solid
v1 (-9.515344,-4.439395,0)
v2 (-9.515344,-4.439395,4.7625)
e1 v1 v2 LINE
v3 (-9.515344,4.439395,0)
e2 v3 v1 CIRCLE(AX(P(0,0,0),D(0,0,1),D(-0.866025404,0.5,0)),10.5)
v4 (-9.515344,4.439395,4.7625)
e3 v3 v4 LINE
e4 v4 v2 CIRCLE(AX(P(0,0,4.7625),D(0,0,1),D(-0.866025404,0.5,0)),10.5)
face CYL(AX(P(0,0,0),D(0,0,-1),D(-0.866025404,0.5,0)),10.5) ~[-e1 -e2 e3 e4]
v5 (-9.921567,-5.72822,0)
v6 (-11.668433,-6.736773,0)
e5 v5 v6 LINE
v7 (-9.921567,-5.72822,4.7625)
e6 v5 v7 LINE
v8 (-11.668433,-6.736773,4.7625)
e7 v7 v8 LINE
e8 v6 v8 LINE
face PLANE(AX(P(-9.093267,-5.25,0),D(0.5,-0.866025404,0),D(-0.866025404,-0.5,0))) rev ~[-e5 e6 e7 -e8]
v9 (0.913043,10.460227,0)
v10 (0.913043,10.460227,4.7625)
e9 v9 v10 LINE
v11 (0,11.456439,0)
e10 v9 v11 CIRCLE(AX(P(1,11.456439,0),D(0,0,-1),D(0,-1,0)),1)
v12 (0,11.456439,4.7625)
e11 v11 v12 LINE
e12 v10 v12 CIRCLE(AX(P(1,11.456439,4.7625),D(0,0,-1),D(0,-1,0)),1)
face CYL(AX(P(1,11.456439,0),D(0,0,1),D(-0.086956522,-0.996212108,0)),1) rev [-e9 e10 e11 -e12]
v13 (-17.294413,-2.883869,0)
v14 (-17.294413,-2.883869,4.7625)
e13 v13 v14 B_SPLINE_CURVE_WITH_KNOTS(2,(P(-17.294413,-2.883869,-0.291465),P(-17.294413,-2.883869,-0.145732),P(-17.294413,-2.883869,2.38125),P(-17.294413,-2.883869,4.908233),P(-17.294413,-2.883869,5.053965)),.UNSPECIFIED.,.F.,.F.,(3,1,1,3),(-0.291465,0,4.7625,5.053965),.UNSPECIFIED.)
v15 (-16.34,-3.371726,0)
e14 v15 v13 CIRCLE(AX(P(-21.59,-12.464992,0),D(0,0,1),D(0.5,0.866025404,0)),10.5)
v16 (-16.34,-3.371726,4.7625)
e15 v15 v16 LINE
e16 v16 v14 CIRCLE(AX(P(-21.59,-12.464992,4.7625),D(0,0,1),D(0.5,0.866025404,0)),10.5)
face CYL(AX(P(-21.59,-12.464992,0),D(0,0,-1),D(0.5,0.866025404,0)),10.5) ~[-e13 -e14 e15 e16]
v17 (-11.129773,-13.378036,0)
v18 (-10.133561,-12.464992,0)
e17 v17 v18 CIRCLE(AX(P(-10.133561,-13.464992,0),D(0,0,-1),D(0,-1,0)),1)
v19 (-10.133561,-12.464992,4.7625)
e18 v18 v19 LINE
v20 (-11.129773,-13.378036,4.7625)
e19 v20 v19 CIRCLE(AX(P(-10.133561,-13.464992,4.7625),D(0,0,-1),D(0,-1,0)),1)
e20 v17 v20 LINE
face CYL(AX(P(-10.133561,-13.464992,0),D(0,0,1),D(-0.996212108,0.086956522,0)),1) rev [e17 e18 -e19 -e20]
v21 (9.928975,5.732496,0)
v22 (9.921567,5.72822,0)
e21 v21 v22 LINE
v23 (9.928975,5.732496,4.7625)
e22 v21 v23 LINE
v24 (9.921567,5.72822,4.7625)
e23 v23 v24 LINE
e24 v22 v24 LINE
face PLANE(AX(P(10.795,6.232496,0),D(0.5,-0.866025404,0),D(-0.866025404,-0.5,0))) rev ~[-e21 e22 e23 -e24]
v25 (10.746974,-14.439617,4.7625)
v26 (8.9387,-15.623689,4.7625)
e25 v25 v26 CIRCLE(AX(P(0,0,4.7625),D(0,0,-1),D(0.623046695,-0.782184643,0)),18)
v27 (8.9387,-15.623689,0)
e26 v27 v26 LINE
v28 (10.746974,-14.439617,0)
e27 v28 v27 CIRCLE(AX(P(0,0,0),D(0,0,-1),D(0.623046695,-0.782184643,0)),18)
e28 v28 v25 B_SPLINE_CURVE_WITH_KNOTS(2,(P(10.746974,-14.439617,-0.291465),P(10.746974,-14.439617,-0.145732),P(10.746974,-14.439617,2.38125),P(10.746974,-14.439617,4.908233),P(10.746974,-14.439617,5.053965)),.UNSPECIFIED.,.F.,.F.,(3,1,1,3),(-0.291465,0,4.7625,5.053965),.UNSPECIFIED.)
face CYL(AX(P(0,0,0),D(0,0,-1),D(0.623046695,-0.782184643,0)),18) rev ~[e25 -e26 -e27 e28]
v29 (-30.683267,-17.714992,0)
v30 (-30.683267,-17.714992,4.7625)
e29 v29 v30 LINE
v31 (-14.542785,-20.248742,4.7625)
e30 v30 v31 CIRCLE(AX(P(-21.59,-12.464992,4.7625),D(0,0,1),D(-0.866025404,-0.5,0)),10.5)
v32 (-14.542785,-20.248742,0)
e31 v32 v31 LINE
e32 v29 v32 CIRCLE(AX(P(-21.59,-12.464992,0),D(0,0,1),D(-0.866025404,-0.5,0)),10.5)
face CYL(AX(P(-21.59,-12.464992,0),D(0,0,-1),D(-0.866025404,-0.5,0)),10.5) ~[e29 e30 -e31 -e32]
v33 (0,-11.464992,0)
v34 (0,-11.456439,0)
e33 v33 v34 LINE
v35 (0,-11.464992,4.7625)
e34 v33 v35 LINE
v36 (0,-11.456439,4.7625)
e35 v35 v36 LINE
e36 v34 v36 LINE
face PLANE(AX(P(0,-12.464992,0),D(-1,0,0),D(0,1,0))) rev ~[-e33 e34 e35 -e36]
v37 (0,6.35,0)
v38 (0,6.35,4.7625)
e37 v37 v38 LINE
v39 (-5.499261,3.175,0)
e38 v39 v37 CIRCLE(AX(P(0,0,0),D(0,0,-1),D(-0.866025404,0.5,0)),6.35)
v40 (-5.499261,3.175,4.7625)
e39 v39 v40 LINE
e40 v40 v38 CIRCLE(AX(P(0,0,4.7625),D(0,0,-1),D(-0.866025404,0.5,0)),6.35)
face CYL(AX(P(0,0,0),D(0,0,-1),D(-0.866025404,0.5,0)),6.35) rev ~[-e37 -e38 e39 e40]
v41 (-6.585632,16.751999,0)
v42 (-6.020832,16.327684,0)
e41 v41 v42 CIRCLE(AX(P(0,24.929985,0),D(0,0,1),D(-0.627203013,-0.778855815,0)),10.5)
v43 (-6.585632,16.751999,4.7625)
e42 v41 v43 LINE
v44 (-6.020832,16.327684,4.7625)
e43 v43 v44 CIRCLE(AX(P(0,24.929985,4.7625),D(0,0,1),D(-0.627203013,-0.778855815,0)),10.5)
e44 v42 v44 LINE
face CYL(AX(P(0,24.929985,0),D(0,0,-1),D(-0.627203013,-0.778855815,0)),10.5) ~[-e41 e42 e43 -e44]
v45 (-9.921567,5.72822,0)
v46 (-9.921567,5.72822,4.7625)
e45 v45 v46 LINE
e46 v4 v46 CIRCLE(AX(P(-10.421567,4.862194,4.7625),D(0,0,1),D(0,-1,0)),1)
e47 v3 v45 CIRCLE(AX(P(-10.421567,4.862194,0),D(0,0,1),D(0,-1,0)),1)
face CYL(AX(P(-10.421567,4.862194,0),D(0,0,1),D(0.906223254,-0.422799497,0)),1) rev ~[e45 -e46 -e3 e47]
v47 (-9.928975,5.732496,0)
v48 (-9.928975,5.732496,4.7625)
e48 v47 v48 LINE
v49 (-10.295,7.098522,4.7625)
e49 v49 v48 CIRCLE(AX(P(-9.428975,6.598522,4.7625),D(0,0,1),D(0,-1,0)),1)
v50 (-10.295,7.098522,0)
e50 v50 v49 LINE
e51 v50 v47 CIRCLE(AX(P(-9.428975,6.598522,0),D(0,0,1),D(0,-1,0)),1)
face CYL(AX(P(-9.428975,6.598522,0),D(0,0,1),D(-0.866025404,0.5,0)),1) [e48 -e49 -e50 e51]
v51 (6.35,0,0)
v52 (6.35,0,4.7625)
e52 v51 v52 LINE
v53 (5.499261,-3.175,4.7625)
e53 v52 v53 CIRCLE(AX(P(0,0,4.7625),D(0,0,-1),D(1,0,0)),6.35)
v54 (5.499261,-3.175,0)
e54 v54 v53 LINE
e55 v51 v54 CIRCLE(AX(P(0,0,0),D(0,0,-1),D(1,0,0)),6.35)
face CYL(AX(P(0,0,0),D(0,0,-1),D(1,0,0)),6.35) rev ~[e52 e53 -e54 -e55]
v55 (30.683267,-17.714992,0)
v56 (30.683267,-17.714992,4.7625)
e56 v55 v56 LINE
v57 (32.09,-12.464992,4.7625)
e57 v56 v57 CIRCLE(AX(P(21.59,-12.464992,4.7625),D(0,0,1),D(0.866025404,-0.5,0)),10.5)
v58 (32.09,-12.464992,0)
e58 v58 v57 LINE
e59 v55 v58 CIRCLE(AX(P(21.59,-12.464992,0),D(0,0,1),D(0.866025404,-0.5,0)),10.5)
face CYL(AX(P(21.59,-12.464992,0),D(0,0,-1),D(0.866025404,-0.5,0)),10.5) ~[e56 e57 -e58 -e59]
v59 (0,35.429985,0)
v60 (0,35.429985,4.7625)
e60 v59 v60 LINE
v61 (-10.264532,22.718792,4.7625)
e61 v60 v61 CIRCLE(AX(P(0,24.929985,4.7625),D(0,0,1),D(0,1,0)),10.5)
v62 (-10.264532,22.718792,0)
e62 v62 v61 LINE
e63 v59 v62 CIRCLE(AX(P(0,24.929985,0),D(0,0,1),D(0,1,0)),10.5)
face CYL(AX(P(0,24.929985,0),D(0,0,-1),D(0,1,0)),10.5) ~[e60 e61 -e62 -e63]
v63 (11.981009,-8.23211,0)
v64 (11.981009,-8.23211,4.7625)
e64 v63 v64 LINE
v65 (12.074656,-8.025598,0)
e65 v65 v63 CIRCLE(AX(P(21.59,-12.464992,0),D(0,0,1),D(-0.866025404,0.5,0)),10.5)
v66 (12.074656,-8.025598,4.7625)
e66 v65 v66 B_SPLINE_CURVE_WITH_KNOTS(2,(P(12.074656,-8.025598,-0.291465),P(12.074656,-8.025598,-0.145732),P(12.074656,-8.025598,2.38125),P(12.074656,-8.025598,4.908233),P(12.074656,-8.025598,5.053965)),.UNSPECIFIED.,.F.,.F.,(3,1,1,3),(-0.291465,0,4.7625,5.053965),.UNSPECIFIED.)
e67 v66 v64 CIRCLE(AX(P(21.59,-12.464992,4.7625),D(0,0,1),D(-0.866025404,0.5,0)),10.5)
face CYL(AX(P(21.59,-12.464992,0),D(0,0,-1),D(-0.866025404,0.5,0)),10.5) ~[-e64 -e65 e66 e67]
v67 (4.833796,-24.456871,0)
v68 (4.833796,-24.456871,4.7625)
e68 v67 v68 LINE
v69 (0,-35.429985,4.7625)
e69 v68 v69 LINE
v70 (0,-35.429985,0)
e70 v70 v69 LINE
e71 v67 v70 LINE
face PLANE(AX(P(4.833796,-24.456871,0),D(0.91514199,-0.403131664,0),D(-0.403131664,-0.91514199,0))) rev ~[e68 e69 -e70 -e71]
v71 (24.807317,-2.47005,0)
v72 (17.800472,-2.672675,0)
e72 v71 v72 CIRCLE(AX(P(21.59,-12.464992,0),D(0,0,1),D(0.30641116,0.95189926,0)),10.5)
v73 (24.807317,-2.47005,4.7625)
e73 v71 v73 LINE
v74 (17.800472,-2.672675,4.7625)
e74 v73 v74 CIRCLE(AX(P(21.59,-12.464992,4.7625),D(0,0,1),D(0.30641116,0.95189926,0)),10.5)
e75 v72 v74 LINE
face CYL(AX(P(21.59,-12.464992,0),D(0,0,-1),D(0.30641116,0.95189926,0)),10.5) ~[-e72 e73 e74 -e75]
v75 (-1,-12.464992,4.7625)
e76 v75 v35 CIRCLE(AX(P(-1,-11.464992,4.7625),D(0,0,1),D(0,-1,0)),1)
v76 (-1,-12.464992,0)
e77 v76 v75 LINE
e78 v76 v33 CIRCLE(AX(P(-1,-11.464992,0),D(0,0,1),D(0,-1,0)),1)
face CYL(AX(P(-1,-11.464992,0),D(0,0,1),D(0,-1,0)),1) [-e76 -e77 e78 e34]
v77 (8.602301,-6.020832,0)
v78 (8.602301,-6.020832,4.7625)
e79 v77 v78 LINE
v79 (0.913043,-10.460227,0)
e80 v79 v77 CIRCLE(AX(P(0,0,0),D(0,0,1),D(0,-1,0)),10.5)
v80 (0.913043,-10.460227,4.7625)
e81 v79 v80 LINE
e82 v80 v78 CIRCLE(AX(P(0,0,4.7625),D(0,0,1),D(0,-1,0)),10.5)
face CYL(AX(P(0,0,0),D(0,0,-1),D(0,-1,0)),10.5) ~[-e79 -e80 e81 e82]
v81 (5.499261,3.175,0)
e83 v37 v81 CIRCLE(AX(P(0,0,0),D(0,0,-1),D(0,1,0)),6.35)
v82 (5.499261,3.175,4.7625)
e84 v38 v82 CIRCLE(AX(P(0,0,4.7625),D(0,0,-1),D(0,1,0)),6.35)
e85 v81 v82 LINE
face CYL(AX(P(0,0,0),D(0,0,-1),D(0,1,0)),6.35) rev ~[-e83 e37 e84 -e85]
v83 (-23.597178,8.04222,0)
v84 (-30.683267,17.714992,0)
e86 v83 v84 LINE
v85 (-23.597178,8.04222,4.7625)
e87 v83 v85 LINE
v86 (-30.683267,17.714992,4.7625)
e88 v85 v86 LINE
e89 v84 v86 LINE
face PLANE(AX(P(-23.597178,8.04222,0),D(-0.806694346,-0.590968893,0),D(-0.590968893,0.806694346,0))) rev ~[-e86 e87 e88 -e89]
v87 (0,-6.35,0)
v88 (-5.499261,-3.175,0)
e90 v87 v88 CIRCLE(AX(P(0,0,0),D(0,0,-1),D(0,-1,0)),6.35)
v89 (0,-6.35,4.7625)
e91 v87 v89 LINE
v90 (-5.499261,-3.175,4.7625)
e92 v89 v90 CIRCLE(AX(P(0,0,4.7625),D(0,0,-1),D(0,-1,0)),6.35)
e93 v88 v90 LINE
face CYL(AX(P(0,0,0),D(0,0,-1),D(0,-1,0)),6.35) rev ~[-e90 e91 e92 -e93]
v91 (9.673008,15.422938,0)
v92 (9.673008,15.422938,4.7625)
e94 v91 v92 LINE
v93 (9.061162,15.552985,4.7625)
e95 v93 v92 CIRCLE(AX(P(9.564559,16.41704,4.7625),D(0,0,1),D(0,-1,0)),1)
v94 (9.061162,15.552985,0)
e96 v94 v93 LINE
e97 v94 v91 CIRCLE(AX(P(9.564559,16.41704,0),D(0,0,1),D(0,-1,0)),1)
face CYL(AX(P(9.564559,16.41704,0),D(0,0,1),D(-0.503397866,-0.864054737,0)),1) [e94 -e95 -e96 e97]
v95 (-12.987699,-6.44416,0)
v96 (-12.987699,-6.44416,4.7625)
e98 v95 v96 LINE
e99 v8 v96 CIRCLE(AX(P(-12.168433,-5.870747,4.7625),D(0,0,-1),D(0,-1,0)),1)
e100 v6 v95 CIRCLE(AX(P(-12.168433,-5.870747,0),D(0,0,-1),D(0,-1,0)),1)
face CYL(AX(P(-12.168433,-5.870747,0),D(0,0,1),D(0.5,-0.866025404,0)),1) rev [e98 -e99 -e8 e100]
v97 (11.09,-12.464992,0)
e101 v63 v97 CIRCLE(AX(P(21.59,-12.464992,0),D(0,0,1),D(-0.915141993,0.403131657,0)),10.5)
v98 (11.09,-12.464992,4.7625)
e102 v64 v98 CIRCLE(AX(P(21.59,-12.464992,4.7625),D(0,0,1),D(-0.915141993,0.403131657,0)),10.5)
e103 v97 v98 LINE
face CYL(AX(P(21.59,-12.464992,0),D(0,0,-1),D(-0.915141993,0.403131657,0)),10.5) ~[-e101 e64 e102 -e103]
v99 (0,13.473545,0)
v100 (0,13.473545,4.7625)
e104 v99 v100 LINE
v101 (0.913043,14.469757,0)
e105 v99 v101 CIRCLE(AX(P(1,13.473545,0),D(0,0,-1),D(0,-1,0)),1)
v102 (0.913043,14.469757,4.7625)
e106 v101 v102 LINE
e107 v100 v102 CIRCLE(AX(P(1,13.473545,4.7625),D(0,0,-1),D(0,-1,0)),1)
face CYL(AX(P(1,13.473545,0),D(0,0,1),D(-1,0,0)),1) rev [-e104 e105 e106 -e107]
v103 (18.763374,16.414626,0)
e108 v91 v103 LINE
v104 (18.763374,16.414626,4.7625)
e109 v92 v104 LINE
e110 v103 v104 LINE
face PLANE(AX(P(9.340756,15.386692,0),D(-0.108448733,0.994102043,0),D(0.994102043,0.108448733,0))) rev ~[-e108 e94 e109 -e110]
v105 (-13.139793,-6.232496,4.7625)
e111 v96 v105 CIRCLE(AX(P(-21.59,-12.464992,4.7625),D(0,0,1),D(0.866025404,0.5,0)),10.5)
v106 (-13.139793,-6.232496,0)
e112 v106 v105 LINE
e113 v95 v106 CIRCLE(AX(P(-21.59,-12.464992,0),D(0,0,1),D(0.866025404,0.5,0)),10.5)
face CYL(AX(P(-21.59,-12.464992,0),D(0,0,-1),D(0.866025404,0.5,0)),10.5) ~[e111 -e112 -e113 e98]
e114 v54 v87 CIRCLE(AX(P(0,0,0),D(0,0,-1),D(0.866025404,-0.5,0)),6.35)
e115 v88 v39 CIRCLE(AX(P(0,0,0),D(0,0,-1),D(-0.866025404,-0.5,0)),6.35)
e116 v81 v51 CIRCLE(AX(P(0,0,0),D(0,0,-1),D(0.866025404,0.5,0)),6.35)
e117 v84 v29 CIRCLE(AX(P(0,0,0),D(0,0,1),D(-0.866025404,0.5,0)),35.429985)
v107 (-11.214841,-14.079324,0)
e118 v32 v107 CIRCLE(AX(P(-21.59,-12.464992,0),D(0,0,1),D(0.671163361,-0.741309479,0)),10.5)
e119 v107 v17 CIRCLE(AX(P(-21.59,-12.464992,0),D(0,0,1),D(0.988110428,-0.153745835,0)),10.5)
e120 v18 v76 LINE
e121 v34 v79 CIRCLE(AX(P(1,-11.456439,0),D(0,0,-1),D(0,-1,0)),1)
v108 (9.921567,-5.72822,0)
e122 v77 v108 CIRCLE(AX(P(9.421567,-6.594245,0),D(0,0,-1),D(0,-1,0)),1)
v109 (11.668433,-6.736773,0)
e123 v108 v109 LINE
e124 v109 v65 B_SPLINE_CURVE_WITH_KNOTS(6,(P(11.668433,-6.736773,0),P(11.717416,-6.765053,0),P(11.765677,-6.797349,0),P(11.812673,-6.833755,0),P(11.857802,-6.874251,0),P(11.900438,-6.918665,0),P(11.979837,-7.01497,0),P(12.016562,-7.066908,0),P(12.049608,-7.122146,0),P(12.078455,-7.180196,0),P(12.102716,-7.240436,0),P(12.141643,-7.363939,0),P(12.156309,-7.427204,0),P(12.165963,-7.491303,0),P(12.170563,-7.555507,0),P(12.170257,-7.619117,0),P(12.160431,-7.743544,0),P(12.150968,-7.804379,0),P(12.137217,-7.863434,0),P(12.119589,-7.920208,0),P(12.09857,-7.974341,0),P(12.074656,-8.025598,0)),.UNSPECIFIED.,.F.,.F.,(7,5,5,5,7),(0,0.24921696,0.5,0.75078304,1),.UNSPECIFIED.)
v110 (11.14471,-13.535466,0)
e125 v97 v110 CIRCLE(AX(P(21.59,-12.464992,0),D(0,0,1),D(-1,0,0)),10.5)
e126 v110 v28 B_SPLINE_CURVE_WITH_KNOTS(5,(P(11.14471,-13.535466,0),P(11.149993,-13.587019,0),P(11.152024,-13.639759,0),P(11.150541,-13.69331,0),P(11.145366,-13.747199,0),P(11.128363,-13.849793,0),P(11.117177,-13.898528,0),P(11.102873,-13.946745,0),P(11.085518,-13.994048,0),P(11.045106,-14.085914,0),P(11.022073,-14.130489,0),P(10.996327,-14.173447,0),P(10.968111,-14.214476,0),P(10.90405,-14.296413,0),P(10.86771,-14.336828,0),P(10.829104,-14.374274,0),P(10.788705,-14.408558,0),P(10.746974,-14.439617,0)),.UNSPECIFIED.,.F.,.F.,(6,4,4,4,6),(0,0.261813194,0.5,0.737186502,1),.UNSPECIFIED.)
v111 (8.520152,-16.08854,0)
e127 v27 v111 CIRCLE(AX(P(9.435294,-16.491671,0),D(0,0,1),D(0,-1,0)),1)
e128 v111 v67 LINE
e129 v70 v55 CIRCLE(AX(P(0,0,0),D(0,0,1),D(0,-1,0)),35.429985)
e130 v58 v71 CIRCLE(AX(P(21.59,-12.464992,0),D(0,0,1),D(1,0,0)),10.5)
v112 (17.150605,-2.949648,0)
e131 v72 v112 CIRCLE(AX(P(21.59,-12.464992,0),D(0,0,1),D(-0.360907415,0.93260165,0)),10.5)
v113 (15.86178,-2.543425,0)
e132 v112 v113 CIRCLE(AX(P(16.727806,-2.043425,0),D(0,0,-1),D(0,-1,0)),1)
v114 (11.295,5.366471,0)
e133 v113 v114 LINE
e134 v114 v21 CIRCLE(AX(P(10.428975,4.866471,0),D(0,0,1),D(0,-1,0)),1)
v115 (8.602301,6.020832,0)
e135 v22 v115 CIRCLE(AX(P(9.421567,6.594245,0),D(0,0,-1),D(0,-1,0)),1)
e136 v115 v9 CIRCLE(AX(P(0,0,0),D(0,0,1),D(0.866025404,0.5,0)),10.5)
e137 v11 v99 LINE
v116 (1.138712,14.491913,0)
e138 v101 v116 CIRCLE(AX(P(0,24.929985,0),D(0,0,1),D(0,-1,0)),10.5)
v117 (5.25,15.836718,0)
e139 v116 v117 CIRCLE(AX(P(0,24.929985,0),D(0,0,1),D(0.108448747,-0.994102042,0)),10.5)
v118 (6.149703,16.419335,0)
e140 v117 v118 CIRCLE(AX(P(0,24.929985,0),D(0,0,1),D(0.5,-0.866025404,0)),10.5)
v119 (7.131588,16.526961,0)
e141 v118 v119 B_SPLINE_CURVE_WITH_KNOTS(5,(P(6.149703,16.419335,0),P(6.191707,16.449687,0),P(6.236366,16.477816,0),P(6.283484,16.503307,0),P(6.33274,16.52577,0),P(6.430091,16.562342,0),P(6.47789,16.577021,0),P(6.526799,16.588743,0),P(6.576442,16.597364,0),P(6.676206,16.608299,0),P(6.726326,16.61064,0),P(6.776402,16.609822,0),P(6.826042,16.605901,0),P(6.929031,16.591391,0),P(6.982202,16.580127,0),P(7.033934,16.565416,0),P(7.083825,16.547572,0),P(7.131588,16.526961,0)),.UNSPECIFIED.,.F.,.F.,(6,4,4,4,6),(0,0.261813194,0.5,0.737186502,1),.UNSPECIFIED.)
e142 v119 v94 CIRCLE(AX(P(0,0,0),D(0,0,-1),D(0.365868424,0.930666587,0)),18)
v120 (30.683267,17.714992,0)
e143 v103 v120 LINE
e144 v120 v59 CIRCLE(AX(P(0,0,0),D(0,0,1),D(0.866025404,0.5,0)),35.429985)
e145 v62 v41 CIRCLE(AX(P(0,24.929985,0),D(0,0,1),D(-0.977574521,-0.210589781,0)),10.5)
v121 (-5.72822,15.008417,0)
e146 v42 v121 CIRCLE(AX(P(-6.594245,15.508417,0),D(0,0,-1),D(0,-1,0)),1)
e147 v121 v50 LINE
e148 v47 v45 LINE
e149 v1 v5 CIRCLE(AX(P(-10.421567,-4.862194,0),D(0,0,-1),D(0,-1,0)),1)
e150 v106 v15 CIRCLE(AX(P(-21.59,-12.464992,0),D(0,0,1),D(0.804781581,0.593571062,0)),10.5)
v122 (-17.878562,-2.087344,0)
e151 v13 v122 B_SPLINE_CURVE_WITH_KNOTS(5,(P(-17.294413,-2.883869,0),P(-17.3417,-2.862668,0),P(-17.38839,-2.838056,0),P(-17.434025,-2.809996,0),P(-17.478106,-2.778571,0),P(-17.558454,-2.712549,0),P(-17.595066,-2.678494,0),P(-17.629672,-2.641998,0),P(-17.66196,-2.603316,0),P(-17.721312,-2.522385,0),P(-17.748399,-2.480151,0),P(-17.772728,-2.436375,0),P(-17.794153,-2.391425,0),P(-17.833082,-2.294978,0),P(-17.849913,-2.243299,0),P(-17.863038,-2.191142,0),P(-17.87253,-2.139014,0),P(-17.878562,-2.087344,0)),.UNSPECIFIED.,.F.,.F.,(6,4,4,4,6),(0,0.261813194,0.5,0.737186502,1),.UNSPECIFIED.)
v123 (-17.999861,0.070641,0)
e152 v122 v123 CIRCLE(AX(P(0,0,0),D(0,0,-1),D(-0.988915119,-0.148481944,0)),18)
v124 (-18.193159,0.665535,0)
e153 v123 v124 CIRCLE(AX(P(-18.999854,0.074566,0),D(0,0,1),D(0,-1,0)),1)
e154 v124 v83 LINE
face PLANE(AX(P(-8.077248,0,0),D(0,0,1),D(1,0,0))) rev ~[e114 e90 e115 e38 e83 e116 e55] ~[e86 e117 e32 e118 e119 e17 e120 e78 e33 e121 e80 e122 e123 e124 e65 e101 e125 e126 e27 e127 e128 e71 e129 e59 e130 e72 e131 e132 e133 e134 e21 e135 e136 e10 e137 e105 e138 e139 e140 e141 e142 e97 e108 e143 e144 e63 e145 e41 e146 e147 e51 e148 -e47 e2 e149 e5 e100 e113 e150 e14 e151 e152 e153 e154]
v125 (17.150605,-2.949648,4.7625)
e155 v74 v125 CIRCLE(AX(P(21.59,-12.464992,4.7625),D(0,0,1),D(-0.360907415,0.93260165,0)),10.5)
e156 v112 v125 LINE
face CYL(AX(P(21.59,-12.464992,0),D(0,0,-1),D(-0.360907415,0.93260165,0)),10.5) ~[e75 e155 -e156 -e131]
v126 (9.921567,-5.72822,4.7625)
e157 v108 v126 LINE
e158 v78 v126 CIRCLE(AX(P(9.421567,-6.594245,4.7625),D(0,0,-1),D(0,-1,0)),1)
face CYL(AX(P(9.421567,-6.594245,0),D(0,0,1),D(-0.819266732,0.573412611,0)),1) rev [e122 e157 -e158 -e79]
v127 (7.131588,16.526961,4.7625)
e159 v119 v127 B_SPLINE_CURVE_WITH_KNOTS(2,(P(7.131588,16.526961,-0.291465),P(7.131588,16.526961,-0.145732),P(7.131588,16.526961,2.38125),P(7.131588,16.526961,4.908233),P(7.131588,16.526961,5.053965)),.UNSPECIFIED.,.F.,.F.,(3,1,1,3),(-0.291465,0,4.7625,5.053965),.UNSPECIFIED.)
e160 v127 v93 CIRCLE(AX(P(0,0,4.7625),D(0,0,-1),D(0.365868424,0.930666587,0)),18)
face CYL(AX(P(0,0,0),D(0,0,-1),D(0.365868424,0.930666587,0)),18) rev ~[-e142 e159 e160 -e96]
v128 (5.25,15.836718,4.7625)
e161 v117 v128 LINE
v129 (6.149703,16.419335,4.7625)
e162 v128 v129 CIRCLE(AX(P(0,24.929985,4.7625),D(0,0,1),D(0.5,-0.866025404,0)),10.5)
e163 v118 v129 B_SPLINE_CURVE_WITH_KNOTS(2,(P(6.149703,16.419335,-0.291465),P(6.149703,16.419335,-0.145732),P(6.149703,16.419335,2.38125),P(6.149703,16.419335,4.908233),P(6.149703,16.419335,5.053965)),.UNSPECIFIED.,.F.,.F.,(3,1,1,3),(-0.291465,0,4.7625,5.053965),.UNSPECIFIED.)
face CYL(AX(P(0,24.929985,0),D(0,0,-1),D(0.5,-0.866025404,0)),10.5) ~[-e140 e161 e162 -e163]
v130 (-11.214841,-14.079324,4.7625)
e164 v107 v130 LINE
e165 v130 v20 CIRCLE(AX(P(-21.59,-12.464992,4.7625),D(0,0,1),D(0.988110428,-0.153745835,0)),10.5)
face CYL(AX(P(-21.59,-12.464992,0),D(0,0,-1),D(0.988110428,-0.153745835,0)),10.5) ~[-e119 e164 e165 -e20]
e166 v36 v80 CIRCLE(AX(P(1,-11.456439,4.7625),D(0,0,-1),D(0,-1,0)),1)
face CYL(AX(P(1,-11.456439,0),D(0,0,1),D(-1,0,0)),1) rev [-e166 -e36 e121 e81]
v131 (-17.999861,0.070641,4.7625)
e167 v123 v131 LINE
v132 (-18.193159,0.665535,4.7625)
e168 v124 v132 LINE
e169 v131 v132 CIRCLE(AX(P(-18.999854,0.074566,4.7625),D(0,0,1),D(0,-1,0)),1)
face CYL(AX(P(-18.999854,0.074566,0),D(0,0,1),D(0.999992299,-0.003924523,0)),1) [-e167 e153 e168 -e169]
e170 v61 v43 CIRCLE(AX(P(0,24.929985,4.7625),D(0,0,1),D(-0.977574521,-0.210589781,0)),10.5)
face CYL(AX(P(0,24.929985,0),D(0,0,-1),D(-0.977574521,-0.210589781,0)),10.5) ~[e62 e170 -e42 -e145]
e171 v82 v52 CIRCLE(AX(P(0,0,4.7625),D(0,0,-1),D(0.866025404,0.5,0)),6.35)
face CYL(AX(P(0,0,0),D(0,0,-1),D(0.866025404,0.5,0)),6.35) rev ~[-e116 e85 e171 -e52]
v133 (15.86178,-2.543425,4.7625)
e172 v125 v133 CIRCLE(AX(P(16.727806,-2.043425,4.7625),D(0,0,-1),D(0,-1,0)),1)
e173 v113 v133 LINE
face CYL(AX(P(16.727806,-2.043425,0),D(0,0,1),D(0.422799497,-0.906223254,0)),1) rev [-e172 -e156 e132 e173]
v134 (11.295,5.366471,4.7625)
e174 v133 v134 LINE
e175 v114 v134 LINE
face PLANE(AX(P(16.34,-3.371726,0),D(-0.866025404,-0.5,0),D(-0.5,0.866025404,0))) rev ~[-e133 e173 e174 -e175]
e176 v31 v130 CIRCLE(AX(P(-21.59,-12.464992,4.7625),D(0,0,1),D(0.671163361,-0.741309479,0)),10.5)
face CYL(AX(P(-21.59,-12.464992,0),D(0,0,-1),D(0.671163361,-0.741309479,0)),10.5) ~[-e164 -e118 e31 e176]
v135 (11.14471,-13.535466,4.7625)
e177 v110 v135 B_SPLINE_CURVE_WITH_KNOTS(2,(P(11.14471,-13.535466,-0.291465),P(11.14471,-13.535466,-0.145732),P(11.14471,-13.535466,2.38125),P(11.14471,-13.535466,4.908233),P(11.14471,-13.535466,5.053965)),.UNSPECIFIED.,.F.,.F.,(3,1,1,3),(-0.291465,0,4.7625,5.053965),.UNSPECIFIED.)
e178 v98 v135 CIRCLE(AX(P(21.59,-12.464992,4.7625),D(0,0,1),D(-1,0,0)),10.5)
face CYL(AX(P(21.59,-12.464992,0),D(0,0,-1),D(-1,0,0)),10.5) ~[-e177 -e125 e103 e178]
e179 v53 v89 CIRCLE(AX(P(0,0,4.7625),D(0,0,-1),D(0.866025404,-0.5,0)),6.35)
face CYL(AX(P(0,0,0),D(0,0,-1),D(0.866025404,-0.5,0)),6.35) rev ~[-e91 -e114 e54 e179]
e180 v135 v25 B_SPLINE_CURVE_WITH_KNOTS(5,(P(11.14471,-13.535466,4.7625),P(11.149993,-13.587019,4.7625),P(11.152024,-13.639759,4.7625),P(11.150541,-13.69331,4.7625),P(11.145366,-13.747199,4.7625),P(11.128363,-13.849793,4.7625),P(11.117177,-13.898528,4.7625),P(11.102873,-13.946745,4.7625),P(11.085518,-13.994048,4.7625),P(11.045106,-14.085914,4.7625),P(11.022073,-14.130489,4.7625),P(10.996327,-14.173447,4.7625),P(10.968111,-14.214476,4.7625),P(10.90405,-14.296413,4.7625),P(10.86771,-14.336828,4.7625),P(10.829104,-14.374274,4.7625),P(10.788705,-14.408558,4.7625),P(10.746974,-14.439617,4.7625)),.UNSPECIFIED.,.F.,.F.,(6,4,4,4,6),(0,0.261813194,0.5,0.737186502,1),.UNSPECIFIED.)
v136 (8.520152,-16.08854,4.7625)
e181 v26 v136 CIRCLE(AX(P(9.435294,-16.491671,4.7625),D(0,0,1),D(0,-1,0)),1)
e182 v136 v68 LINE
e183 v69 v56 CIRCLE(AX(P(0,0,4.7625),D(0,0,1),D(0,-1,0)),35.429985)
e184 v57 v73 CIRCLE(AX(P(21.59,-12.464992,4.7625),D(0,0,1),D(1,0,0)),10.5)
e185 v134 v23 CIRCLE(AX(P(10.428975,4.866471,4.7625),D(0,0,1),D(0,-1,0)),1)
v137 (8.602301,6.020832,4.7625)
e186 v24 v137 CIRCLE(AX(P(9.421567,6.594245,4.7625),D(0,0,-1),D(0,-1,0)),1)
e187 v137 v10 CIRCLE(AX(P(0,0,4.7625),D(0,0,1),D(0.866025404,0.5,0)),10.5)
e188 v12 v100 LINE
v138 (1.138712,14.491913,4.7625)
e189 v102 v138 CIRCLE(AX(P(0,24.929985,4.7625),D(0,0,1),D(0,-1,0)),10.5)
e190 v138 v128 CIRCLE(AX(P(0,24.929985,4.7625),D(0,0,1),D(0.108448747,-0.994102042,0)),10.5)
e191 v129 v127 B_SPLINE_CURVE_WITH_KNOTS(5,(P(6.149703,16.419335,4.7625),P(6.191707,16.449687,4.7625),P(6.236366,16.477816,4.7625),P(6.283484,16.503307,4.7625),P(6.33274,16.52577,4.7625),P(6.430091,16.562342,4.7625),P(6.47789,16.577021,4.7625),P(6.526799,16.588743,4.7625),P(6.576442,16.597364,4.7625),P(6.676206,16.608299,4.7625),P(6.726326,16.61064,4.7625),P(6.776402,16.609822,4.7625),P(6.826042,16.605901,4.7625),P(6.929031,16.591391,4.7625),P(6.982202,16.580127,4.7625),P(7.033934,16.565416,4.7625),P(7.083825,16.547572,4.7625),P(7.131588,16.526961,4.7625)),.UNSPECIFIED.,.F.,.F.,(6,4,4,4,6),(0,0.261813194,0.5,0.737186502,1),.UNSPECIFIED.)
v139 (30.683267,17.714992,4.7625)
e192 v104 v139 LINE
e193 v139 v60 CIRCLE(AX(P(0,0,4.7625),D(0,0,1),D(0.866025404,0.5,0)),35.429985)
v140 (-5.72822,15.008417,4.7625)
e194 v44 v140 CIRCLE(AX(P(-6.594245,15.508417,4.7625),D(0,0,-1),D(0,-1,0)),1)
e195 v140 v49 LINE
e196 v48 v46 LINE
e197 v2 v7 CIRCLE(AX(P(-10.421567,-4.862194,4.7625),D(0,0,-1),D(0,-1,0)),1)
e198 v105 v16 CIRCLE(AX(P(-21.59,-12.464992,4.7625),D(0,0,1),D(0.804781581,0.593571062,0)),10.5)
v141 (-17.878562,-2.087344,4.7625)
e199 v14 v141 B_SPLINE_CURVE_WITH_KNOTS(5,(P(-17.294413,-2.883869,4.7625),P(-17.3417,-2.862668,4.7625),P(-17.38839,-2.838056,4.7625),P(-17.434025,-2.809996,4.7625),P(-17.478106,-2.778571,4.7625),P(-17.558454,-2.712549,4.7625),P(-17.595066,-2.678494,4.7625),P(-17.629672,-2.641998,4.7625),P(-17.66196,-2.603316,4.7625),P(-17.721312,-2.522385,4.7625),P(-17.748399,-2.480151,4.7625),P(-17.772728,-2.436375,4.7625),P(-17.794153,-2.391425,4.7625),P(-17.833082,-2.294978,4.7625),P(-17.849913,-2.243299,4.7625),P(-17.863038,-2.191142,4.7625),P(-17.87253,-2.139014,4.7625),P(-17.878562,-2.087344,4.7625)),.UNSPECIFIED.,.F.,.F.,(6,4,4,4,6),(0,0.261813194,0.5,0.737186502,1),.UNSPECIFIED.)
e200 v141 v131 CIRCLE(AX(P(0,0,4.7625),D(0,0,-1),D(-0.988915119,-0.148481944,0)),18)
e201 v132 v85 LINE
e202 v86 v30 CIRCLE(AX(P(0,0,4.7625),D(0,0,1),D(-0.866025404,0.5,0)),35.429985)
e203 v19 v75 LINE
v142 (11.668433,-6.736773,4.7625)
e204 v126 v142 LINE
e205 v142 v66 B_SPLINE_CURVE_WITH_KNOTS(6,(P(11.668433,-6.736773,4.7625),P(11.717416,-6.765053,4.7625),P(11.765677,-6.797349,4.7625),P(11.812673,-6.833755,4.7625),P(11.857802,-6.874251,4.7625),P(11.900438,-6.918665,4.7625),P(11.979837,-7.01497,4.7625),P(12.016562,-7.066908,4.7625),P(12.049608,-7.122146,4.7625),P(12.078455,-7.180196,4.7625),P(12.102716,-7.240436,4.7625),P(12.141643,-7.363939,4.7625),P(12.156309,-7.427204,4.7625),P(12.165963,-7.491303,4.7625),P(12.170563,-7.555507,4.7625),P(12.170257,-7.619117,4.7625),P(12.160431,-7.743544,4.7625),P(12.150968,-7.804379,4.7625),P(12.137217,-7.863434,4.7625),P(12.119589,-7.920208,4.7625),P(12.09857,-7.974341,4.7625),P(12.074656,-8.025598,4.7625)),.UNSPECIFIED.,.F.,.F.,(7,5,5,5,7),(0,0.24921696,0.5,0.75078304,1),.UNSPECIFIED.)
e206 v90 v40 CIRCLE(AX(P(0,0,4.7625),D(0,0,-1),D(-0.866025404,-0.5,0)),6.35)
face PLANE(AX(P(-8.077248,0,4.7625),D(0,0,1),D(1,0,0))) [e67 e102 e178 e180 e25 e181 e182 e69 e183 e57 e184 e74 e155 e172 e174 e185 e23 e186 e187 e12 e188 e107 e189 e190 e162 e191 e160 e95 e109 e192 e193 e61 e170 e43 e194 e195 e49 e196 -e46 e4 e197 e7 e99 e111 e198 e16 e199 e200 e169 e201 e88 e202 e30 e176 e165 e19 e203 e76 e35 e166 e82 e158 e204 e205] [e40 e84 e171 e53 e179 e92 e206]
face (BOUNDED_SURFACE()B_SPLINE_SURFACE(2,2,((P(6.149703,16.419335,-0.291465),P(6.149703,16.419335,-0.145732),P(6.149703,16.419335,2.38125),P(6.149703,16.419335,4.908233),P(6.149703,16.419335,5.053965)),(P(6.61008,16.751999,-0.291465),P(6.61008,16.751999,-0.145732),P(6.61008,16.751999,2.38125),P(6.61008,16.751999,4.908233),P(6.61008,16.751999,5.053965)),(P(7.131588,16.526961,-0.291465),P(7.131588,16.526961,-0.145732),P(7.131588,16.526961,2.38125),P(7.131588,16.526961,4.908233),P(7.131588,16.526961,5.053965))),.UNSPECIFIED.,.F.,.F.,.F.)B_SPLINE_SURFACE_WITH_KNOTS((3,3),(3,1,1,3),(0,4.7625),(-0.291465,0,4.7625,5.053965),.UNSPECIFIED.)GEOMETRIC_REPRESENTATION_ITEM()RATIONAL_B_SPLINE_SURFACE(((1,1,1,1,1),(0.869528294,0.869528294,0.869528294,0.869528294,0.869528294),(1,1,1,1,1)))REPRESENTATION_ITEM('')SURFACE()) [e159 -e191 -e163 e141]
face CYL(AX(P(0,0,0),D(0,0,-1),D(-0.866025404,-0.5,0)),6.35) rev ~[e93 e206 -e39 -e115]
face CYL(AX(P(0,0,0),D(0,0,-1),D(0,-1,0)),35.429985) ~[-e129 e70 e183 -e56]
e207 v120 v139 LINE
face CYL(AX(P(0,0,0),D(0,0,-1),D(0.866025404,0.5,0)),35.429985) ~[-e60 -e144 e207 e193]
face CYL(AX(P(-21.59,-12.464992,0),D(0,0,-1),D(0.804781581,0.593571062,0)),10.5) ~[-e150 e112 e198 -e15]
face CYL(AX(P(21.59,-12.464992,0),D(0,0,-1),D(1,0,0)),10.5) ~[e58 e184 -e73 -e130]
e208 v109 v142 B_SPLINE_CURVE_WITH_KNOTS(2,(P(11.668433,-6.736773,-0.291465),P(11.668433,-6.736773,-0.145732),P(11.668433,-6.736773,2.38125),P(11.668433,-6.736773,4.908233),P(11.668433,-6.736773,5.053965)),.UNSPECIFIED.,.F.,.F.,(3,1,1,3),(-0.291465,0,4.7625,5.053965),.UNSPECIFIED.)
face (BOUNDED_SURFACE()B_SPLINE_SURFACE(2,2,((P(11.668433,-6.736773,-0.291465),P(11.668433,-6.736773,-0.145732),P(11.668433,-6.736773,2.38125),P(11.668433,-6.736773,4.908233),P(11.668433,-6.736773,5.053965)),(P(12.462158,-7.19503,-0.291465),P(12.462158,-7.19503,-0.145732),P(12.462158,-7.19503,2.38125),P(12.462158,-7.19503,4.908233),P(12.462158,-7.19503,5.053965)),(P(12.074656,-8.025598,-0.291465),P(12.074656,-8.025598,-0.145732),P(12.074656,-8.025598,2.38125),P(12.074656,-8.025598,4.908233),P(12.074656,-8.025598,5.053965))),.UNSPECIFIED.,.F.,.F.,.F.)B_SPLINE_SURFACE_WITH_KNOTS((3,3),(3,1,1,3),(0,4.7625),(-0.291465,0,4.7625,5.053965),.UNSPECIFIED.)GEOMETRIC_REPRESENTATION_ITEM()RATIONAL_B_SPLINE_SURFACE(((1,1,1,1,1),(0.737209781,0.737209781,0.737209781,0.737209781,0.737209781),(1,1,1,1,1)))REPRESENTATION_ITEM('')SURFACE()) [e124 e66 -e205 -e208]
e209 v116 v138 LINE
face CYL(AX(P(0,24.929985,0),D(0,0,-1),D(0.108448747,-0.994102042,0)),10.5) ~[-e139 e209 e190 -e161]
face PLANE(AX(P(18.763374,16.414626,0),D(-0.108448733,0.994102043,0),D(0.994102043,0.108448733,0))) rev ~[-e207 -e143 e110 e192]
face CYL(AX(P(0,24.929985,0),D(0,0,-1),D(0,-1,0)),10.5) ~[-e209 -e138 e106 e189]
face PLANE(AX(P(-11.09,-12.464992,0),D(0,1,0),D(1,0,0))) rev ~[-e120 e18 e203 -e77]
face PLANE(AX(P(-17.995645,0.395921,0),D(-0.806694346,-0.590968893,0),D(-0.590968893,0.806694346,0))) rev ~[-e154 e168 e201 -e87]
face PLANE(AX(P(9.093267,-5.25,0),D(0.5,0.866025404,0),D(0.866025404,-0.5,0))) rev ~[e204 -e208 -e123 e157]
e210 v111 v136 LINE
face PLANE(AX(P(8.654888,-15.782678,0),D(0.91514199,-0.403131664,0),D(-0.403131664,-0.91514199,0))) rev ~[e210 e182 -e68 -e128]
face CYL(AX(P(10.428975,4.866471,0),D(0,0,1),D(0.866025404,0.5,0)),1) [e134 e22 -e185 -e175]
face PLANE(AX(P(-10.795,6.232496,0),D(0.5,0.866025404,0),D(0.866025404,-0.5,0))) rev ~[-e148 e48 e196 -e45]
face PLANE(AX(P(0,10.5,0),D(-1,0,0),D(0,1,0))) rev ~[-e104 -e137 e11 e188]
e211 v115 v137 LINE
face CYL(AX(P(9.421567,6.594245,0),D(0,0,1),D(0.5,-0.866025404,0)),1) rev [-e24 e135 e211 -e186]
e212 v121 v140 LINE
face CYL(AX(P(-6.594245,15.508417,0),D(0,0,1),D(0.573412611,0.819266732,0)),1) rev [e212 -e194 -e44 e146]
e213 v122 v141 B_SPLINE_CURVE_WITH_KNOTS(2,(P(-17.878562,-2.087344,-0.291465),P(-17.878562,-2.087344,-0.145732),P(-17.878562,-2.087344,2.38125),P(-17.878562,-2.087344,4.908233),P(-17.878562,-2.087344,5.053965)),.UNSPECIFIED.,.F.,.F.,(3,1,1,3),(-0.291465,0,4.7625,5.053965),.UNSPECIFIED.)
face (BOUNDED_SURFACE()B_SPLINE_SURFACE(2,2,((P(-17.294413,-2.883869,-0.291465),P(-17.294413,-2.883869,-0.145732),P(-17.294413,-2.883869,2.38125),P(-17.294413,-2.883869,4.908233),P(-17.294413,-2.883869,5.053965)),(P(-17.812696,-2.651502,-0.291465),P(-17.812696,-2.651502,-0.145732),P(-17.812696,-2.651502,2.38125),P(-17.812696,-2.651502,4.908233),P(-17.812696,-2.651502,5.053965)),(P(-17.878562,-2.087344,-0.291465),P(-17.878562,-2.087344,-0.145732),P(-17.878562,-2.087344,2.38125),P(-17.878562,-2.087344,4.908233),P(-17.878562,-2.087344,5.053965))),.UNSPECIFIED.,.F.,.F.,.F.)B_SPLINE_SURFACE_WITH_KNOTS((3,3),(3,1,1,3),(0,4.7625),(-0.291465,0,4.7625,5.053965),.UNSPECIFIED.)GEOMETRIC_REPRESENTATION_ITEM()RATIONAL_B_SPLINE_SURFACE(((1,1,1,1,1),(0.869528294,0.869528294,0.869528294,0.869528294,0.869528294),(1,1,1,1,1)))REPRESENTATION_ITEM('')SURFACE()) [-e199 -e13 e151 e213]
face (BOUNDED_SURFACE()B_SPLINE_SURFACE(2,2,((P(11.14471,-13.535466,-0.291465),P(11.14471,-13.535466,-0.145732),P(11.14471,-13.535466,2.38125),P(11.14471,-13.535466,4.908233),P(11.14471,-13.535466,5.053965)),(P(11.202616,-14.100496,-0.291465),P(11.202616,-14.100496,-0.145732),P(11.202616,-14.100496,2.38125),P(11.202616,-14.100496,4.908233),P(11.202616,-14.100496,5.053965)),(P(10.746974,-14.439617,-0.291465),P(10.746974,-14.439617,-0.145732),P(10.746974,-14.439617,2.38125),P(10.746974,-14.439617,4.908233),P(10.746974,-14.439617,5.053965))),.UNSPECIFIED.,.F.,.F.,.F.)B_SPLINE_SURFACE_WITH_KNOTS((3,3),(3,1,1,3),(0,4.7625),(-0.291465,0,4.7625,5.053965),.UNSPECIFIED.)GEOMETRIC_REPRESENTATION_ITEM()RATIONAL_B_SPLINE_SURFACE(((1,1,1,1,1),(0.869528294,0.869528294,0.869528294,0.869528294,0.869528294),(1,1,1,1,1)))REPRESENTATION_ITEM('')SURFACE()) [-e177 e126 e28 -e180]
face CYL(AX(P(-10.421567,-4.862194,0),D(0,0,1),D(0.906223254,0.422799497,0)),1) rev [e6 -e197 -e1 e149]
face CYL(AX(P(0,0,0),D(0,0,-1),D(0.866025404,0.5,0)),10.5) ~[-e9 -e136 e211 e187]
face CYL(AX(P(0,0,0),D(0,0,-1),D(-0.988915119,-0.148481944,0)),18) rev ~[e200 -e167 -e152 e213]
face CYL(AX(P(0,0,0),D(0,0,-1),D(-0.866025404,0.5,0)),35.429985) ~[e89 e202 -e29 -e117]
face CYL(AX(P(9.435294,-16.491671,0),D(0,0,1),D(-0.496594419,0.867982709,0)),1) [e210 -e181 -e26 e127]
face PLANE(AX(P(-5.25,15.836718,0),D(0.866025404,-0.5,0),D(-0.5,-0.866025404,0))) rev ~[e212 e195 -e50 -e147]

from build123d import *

# Parameters (mm, degrees)
F1_DEPTH = 4.7625
F2_R     = 1


with BuildPart() as f1:
    # F0 (on Top) → F1 (new body)
    with BuildSketch(Plane.XY):
        with BuildLine():
            ThreePointArc((-5.499261314, -3.175), (-6.35, 0), (-5.499261314, 3.175))
            Line((-5.499261314, 3.175), (-9.0932667397, 5.25))
            ThreePointArc((-9.0932667397, 5.25), (-10.5, 0), (-9.0932667397, -5.25))
            Line((-9.0932667397, -5.25), (-5.499261314, -3.175))
        make_face()
        with BuildLine():
            Line((0, -10.5), (0, -6.35))
            ThreePointArc((0, -6.35), (-3.175, -5.499261314), (-5.499261314, -3.175))
            Line((-5.499261314, -3.175), (-9.0932667397, -5.25))
            ThreePointArc((-9.0932667397, -5.25), (-5.25, -9.0932667397), (0, -10.5))
        make_face()
        with BuildLine():
            Line((9.0932667397, -5.25), (5.499261314, -3.175))
            ThreePointArc((5.499261314, -3.175), (3.175, -5.499261314), (0, -6.35))
            Line((0, -6.35), (0, -10.5))
            ThreePointArc((0, -10.5), (5.25, -9.0932667397), (9.0932667397, -5.25))
        make_face()
        with BuildLine():
            ThreePointArc((5.499261314, 3.175), (6.1336289969, 1.6435009364), (6.35, 0))
            ThreePointArc((6.35, 0), (6.1336289969, -1.6435009364), (5.499261314, -3.175))
            Line((5.499261314, -3.175), (9.0932667397, -5.25))
            ThreePointArc((9.0932667397, -5.25), (10.142221176, -2.7175999736), (10.5, 0))
            ThreePointArc((10.5, 0), (10.142221176, 2.7175999736), (9.0932667397, 5.25))
            Line((9.0932667397, 5.25), (5.499261314, 3.175))
        make_face()
        with BuildLine():
            ThreePointArc((0, 6.35), (3.175, 5.499261314), (5.499261314, 3.175))
            Line((5.499261314, 3.175), (9.0932667397, 5.25))
            ThreePointArc((9.0932667397, 5.25), (5.25, 9.0932667397), (0, 10.5))
            Line((0, 10.5), (0, 6.35))
        make_face()
        with BuildLine():
            ThreePointArc((-5.499261314, 3.175), (-3.175, 5.499261314), (0, 6.35))
            Line((0, 6.35), (0, 10.5))
            ThreePointArc((0, 10.5), (-5.25, 9.0932667397), (-9.0932667397, 5.25))
            Line((-9.0932667397, 5.25), (-5.499261314, 3.175))
        make_face()
        with BuildLine():
            Line((-30.6832667397, -17.7149923118), (-21.59, -12.4649923118))
            ThreePointArc((-21.59, -12.4649923118), (-23.7308339091, -7.638825519), (-24.8073171849, -2.4700500843))
            ThreePointArc((-24.8073171849, -2.4700500843), (-31.387432573, -8.6887090891), (-30.6832667397, -17.7149923118))
        make_face()
        with BuildLine():
            ThreePointArc((-14.5427847141, -20.2487418398), (-18.4808339091, -16.7320922588), (-21.59, -12.4649923118))
            Line((-21.59, -12.4649923118), (-30.6832667397, -17.7149923118))
            ThreePointArc((-30.6832667397, -17.7149923118), (-23.2183590837, -22.8379594232), (-14.5427847141, -20.2487418398))
        make_face()
        with BuildLine():
            ThreePointArc((-24.8073171849, -2.4700500843), (-24.7664239313, 2.8510312146), (-23.5971783755, 8.0422202188))
            Line((-23.5971783755, 8.0422202188), (-30.6832667397, 17.7149923118))
            ThreePointArc((-30.6832667397, 17.7149923118), (-35.4299846236, 0), (-30.6832667397, -17.7149923118))
            ThreePointArc((-30.6832667397, -17.7149923118), (-31.387432573, -8.6887090891), (-24.8073171849, -2.4700500843))
        make_face()
        with BuildLine():
            ThreePointArc((-17.8004721403, -2.6726749865), (-17.9637015789, -1.1425522236), (-17.9956452163, 0.3959207605))
            Line((-17.9956452163, 0.3959207605), (-23.5971783755, 8.0422202188))
            ThreePointArc((-23.5971783755, 8.0422202188), (-24.7664239313, 2.8510312146), (-24.8073171849, -2.4700500843))
            ThreePointArc((-24.8073171849, -2.4700500843), (-21.286486447, -1.9693799179), (-17.8004721403, -2.6726749865))
        make_face()
        with BuildLine():
            Line((-21.59, -12.4649923118), (-17.2877645627, -5.0133019483))
            ThreePointArc((-17.2877645627, -5.0133019483), (-17.5831090076, -3.851529258), (-17.8004721403, -2.6726749865))
            ThreePointArc((-17.8004721403, -2.6726749865), (-21.286486447, -1.9693799179), (-24.8073171849, -2.4700500843))
            ThreePointArc((-24.8073171849, -2.4700500843), (-23.7308339091, -7.638825519), (-21.59, -12.4649923118))
        make_face()
        with BuildLine():
            ThreePointArc((-11.2148405045, -14.0793235796), (-12.1270766847, -13.3016544491), (-12.9855291254, -12.4649923118))
            Line((-12.9855291254, -12.4649923118), (-21.59, -12.4649923118))
            ThreePointArc((-21.59, -12.4649923118), (-18.4808339091, -16.7320922588), (-14.5427847141, -20.2487418398))
            ThreePointArc((-14.5427847141, -20.2487418398), (-12.3487762621, -17.4499480615), (-11.2148405045, -14.0793235796))
        make_face()
        with BuildLine():
            ThreePointArc((-12.9855291254, -12.4649923118), (-14.3916544405, -10.8111184651), (-15.5884572681, -9))
            Line((-15.5884572681, -9), (-21.59, -12.4649923118))
            Line((-21.59, -12.4649923118), (-12.9855291254, -12.4649923118))
        make_face()
        with BuildLine():
            Line((-21.59, -12.4649923118), (-15.5884572681, -9))
            ThreePointArc((-15.5884572681, -9), (-16.5585304543, -7.0579791154), (-17.2877645627, -5.0133019483))
            Line((-17.2877645627, -5.0133019483), (-21.59, -12.4649923118))
        make_face()
        with BuildLine():
            Line((-15.5884572681, -9), (-12.4967332603, -7.2149923118))
            ThreePointArc((-12.4967332603, -7.2149923118), (-12.8045182874, -6.7147478755), (-13.139793395, -6.2324961559))
            ThreePointArc((-13.139793395, -6.2324961559), (-14.5921490915, -4.6368327157), (-16.34, -3.3717255721))
            Line((-16.34, -3.3717255721), (-17.2877645627, -5.0133019483))
            ThreePointArc((-17.2877645627, -5.0133019483), (-16.5585304543, -7.0579791154), (-15.5884572681, -9))
        make_face()
        with BuildLine():
            ThreePointArc((-11.09, -12.4649923118), (-11.447778824, -9.7473923382), (-12.4967332603, -7.2149923118))
            Line((-12.4967332603, -7.2149923118), (-15.5884572681, -9))
            ThreePointArc((-15.5884572681, -9), (-14.3916544405, -10.8111184651), (-12.9855291254, -12.4649923118))
            Line((-12.9855291254, -12.4649923118), (-11.09, -12.4649923118))
        make_face()
        with BuildLine():
            Line((-17.2877645627, -5.0133019483), (-16.34, -3.3717255721))
            ThreePointArc((-16.34, -3.3717255721), (-17.0567413584, -2.9940068252), (-17.8004721403, -2.6726749865))
            ThreePointArc((-17.8004721403, -2.6726749865), (-17.5831090076, -3.851529258), (-17.2877645627, -5.0133019483))
        make_face()
        with BuildLine():
            ThreePointArc((-11.2148405045, -14.0793235796), (-11.1212566489, -13.2745679095), (-11.09, -12.4649923118))
            Line((-11.09, -12.4649923118), (-12.9855291254, -12.4649923118))
            ThreePointArc((-12.9855291254, -12.4649923118), (-12.1270766847, -13.3016544491), (-11.2148405045, -14.0793235796))
        make_face()
        with BuildLine():
            Line((21.59, -12.4649923118), (17.2877645627, -5.0133019483))
            ThreePointArc((17.2877645627, -5.0133019483), (16.5585304543, -7.0579791154), (15.5884572681, -9))
            Line((15.5884572681, -9), (21.59, -12.4649923118))
        make_face()
        with BuildLine():
            Line((17.2877645627, -5.0133019483), (16.34, -3.3717255721))
            ThreePointArc((16.34, -3.3717255721), (14.1653787975, -5.0403711093), (12.4967332603, -7.2149923118))
            Line((12.4967332603, -7.2149923118), (15.5884572681, -9))
            ThreePointArc((15.5884572681, -9), (16.5585304543, -7.0579791154), (17.2877645627, -5.0133019483))
        make_face()
        with BuildLine():
            Line((15.5884572681, -9), (12.4967332603, -7.2149923118))
            ThreePointArc((12.4967332603, -7.2149923118), (12.2250524559, -7.7165444079), (11.9810090739, -8.2321099153))
            ThreePointArc((11.9810090739, -8.2321099153), (11.3151665531, -10.3021706275), (11.09, -12.4649923118))
            Line((11.09, -12.4649923118), (12.9855291254, -12.4649923118))
            ThreePointArc((12.9855291254, -12.4649923118), (14.3916544405, -10.8111184651), (15.5884572681, -9))
        make_face()
        with BuildLine():
            Line((21.59, -12.4649923118), (15.5884572681, -9))
            ThreePointArc((15.5884572681, -9), (14.3916544405, -10.8111184651), (12.9855291254, -12.4649923118))
            Line((12.9855291254, -12.4649923118), (21.59, -12.4649923118))
        make_face()
        with BuildLine():
            ThreePointArc((14.5427847141, -20.2487418398), (18.4808339091, -16.7320922588), (21.59, -12.4649923118))
            Line((21.59, -12.4649923118), (12.9855291254, -12.4649923118))
            ThreePointArc((12.9855291254, -12.4649923118), (12.1270766847, -13.3016544491), (11.2148405045, -14.0793235796))
            ThreePointArc((11.2148405045, -14.0793235796), (12.3487762621, -17.4499480615), (14.5427847141, -20.2487418398))
        make_face()
        with BuildLine():
            ThreePointArc((24.8073171849, -2.4700500843), (23.7308339091, -7.638825519), (21.59, -12.4649923118))
            Line((21.59, -12.4649923118), (30.6832667397, -17.7149923118))
            ThreePointArc((30.6832667397, -17.7149923118), (31.732221176, -15.1825922854), (32.09, -12.4649923118))
            ThreePointArc((32.09, -12.4649923118), (30.0762191358, -6.2816206766), (24.8073171849, -2.4700500843))
        make_face()
        with BuildLine():
            ThreePointArc((17.8004721403, -2.6726749865), (17.5831090076, -3.851529258), (17.2877645627, -5.0133019483))
            Line((17.2877645627, -5.0133019483), (21.59, -12.4649923118))
            ThreePointArc((21.59, -12.4649923118), (23.7308339091, -7.638825519), (24.8073171849, -2.4700500843))
            ThreePointArc((24.8073171849, -2.4700500843), (21.286486447, -1.9693799179), (17.8004721403, -2.6726749865))
        make_face()
        with BuildLine():
            ThreePointArc((17.8004721403, -2.6726749865), (17.0567413584, -2.9940068252), (16.34, -3.3717255721))
            Line((16.34, -3.3717255721), (17.2877645627, -5.0133019483))
            ThreePointArc((17.2877645627, -5.0133019483), (17.5831090076, -3.851529258), (17.8004721403, -2.6726749865))
        make_face()
        with BuildLine():
            ThreePointArc((30.6832667397, -17.7149923118), (23.2183590837, -22.8379594232), (14.5427847141, -20.2487418398))
            ThreePointArc((14.5427847141, -20.2487418398), (9.9141341412, -22.8738732523), (4.8337957326, -24.4568712666))
            Line((4.8337957326, -24.4568712666), (0, -35.4299846236))
            ThreePointArc((0, -35.4299846236), (17.7149923118, -30.6832667397), (30.6832667397, -17.7149923118))
        make_face()
        with BuildLine():
            ThreePointArc((11.2148405045, -14.0793235796), (9.9713029836, -14.9857638047), (8.6548881807, -15.7826775479))
            Line((8.6548881807, -15.7826775479), (4.8337957326, -24.4568712666))
            ThreePointArc((4.8337957326, -24.4568712666), (9.9141341412, -22.8738732523), (14.5427847141, -20.2487418398))
            ThreePointArc((14.5427847141, -20.2487418398), (12.3487762621, -17.4499480615), (11.2148405045, -14.0793235796))
        make_face()
        with BuildLine():
            Line((12.9855291254, -12.4649923118), (11.09, -12.4649923118))
            ThreePointArc((11.09, -12.4649923118), (11.1212566489, -13.2745679095), (11.2148405045, -14.0793235796))
            ThreePointArc((11.2148405045, -14.0793235796), (12.1270766847, -13.3016544491), (12.9855291254, -12.4649923118))
        make_face()
        with BuildLine():
            Line((30.6832667397, -17.7149923118), (21.59, -12.4649923118))
            ThreePointArc((21.59, -12.4649923118), (18.4808339091, -16.7320922588), (14.5427847141, -20.2487418398))
            ThreePointArc((14.5427847141, -20.2487418398), (23.2183590837, -22.8379594232), (30.6832667397, -17.7149923118))
        make_face()
        with BuildLine():
            Line((0, 18), (0, 14.4299846236))
            ThreePointArc((0, 14.4299846236), (0.5701972901, 14.4454781951), (1.1387118387, 14.4919131854))
            ThreePointArc((1.1387118387, 14.4919131854), (3.2643582308, 14.9503070065), (5.25, 15.8367178839))
            Line((5.25, 15.8367178839), (4.3022354373, 17.4782942601))
            ThreePointArc((4.3022354373, 17.4782942601), (2.1668760138, 17.8690975805), (0, 18))
        make_face()
        with BuildLine():
            ThreePointArc((-4.3022354373, 17.4782942601), (-2.1668760138, 17.8690975805), (0, 18))
            Line((0, 18), (0, 24.9299846236))
            Line((0, 24.9299846236), (-4.3022354373, 17.4782942601))
        make_face()
        with BuildLine():
            Line((0, 24.9299846236), (0, 18))
            ThreePointArc((0, 18), (2.1668760138, 17.8690975805), (4.3022354373, 17.4782942601))
            Line((4.3022354373, 17.4782942601), (0, 24.9299846236))
        make_face()
        with BuildLine():
            ThreePointArc((-6.5856316358, 16.7519985661), (-5.9354847095, 16.2685747347), (-5.25, 15.8367178839))
            Line((-5.25, 15.8367178839), (-4.3022354373, 17.4782942601))
            ThreePointArc((-4.3022354373, 17.4782942601), (-5.456032323, 17.1531837071), (-6.5856316358, 16.7519985661))
        make_face()
        with BuildLine():
            Line((0, 24.9299846236), (4.3022354373, 17.4782942601))
            ThreePointArc((4.3022354373, 17.4782942601), (5.456032323, 17.1531837071), (6.5856316358, 16.7519985661))
            ThreePointArc((6.5856316358, 16.7519985661), (8.9377101849, 19.4193279794), (10.2645324709, 22.718791924))
            ThreePointArc((10.2645324709, 22.718791924), (5.25, 24.3709177778), (0, 24.9299846236))
        make_face()
        with BuildLine():
            Line((4.3022354373, 17.4782942601), (5.25, 15.8367178839))
            ThreePointArc((5.25, 15.8367178839), (5.9354847095, 16.2685747347), (6.5856316358, 16.7519985661))
            ThreePointArc((6.5856316358, 16.7519985661), (5.456032323, 17.1531837071), (4.3022354373, 17.4782942601))
        make_face()
        with BuildLine():
            ThreePointArc((-5.25, 15.8367178839), (-2.7175999736, 14.7877634476), (0, 14.4299846236))
            Line((0, 14.4299846236), (0, 18))
            ThreePointArc((0, 18), (-2.1668760138, 17.8690975805), (-4.3022354373, 17.4782942601))
            Line((-4.3022354373, 17.4782942601), (-5.25, 15.8367178839))
        make_face()
        with BuildLine():
            ThreePointArc((-6.5856316358, 16.7519985661), (-5.456032323, 17.1531837071), (-4.3022354373, 17.4782942601))
            Line((-4.3022354373, 17.4782942601), (0, 24.9299846236))
            ThreePointArc((0, 24.9299846236), (-5.25, 24.3709177778), (-10.2645324709, 22.718791924))
            ThreePointArc((-10.2645324709, 22.718791924), (-8.9377101849, 19.4193279794), (-6.5856316358, 16.7519985661))
        make_face()
        with BuildLine():
            ThreePointArc((-10.2645324709, 22.718791924), (-5.25, 24.3709177778), (0, 24.9299846236))
            Line((0, 24.9299846236), (0, 35.4299846236))
            ThreePointArc((0, 35.4299846236), (-8.1690734892, 31.5266685123), (-10.2645324709, 22.718791924))
        make_face()
        with BuildLine():
            Line((0, 35.4299846236), (0, 24.9299846236))
            ThreePointArc((0, 24.9299846236), (5.25, 24.3709177778), (10.2645324709, 22.718791924))
            ThreePointArc((10.2645324709, 22.718791924), (10.4409671713, 23.8181372744), (10.5, 24.9299846236))
            ThreePointArc((10.5, 24.9299846236), (7.4246212025, 32.3546058261), (0, 35.4299846236))
        make_face()
        with BuildLine():
            ThreePointArc((10.2645324709, 22.718791924), (14.8522882489, 20.022828649), (18.7633739476, 16.4146255344))
            Line((18.7633739476, 16.4146255344), (30.6832667397, 17.7149923118))
            ThreePointArc((30.6832667397, 17.7149923118), (17.7149923118, 30.6832667397), (0, 35.4299846236))
            ThreePointArc((0, 35.4299846236), (7.4246212025, 32.3546058261), (10.5, 24.9299846236))
            ThreePointArc((10.5, 24.9299846236), (10.4409671713, 23.8181372744), (10.2645324709, 22.718791924))
        make_face()
        with BuildLine():
            ThreePointArc((6.5856316358, 16.7519985661), (7.9924006582, 16.128283595), (9.3407556058, 15.3866918053))
            Line((9.3407556058, 15.3866918053), (18.7633739476, 16.4146255344))
            ThreePointArc((18.7633739476, 16.4146255344), (14.8522882489, 20.022828649), (10.2645324709, 22.718791924))
            ThreePointArc((10.2645324709, 22.718791924), (8.9377101849, 19.4193279794), (6.5856316358, 16.7519985661))
        make_face()
        with BuildLine():
            ThreePointArc((-9.0932667397, 5.25), (-5.25, 9.0932667397), (0, 10.5))
            Line((0, 10.5), (0, 14.3676886584))
            Line((0, 14.3676886584), (0, 14.4299846236))
            ThreePointArc((0, 14.4299846236), (-2.7175999736, 14.7877634476), (-5.25, 15.8367178839))
            Line((-5.25, 15.8367178839), (-10.795, 6.2324961559))
            Line((-10.795, 6.2324961559), (-9.0932667397, 5.25))
        make_face()
        with BuildLine():
            Line((10.795, 6.2324961559), (9.0932667397, 5.25))
            ThreePointArc((9.0932667397, 5.25), (10.142221176, 2.7175999736), (10.5, 0))
            ThreePointArc((10.5, 0), (10.142221176, -2.7175999736), (9.0932667397, -5.25))
            Line((9.0932667397, -5.25), (12.4427833719, -7.1838443292))
            Line((12.4427833719, -7.1838443292), (12.4967332603, -7.2149923118))
            ThreePointArc((12.4967332603, -7.2149923118), (14.1653787975, -5.0403711093), (16.34, -3.3717255721))
            Line((16.34, -3.3717255721), (10.795, 6.2324961559))
        make_face()
        with BuildLine():
            Line((0, -12.4649923118), (0, -10.5))
            ThreePointArc((0, -10.5), (-5.25, -9.0932667397), (-9.0932667397, -5.25))
            Line((-9.0932667397, -5.25), (-12.4967332603, -7.2149923118))
            ThreePointArc((-12.4967332603, -7.2149923118), (-11.447778824, -9.7473923382), (-11.09, -12.4649923118))
            Line((-11.09, -12.4649923118), (0, -12.4649923118))
        make_face()
    extrude(amount=F1_DEPTH)

    # F2
    f2_edges = [f1.edges().sort_by_distance(p)[0] for p in [
        (0, -12.464992, 2.38125),
        (10.795, 6.232496, 2.38125),
        (-10.795, 6.232496, 2.38125),
        (8.654888, -15.782678, 2.38125),
        (11.214841, -14.079324, 2.38125),
        (-17.995645, 0.395921, 2.38125),
        (-17.800472, -2.672675, 2.38125),
        (9.340756, 15.386692, 2.38125),
        (6.585632, 16.751999, 2.38125),
        (0, 35.429985, 2.38125),
        (9.093267, -5.25, 2.38125),
        (0, -10.5, 2.38125),
        (0, 10.5, 2.38125),
        (-9.093267, -5.25, 2.38125),
        (30.683267, -17.714992, 2.38125),
        (-9.093267, 5.25, 2.38125),
        (-5.25, 15.836718, 2.38125),
        (-11.09, -12.464992, 2.38125),
        (9.093267, 5.25, 2.38125),
        (-30.683267, -17.714992, 2.38125),
        (16.34, -3.371726, 2.38125),
        (-12.496733, -7.214992, 2.38125),
        (12.496733, -7.214992, 2.38125),
        (0, 14.429985, 2.38125),
    ]]
    fillet(f2_edges, radius=F2_R)


solid = f1.part
